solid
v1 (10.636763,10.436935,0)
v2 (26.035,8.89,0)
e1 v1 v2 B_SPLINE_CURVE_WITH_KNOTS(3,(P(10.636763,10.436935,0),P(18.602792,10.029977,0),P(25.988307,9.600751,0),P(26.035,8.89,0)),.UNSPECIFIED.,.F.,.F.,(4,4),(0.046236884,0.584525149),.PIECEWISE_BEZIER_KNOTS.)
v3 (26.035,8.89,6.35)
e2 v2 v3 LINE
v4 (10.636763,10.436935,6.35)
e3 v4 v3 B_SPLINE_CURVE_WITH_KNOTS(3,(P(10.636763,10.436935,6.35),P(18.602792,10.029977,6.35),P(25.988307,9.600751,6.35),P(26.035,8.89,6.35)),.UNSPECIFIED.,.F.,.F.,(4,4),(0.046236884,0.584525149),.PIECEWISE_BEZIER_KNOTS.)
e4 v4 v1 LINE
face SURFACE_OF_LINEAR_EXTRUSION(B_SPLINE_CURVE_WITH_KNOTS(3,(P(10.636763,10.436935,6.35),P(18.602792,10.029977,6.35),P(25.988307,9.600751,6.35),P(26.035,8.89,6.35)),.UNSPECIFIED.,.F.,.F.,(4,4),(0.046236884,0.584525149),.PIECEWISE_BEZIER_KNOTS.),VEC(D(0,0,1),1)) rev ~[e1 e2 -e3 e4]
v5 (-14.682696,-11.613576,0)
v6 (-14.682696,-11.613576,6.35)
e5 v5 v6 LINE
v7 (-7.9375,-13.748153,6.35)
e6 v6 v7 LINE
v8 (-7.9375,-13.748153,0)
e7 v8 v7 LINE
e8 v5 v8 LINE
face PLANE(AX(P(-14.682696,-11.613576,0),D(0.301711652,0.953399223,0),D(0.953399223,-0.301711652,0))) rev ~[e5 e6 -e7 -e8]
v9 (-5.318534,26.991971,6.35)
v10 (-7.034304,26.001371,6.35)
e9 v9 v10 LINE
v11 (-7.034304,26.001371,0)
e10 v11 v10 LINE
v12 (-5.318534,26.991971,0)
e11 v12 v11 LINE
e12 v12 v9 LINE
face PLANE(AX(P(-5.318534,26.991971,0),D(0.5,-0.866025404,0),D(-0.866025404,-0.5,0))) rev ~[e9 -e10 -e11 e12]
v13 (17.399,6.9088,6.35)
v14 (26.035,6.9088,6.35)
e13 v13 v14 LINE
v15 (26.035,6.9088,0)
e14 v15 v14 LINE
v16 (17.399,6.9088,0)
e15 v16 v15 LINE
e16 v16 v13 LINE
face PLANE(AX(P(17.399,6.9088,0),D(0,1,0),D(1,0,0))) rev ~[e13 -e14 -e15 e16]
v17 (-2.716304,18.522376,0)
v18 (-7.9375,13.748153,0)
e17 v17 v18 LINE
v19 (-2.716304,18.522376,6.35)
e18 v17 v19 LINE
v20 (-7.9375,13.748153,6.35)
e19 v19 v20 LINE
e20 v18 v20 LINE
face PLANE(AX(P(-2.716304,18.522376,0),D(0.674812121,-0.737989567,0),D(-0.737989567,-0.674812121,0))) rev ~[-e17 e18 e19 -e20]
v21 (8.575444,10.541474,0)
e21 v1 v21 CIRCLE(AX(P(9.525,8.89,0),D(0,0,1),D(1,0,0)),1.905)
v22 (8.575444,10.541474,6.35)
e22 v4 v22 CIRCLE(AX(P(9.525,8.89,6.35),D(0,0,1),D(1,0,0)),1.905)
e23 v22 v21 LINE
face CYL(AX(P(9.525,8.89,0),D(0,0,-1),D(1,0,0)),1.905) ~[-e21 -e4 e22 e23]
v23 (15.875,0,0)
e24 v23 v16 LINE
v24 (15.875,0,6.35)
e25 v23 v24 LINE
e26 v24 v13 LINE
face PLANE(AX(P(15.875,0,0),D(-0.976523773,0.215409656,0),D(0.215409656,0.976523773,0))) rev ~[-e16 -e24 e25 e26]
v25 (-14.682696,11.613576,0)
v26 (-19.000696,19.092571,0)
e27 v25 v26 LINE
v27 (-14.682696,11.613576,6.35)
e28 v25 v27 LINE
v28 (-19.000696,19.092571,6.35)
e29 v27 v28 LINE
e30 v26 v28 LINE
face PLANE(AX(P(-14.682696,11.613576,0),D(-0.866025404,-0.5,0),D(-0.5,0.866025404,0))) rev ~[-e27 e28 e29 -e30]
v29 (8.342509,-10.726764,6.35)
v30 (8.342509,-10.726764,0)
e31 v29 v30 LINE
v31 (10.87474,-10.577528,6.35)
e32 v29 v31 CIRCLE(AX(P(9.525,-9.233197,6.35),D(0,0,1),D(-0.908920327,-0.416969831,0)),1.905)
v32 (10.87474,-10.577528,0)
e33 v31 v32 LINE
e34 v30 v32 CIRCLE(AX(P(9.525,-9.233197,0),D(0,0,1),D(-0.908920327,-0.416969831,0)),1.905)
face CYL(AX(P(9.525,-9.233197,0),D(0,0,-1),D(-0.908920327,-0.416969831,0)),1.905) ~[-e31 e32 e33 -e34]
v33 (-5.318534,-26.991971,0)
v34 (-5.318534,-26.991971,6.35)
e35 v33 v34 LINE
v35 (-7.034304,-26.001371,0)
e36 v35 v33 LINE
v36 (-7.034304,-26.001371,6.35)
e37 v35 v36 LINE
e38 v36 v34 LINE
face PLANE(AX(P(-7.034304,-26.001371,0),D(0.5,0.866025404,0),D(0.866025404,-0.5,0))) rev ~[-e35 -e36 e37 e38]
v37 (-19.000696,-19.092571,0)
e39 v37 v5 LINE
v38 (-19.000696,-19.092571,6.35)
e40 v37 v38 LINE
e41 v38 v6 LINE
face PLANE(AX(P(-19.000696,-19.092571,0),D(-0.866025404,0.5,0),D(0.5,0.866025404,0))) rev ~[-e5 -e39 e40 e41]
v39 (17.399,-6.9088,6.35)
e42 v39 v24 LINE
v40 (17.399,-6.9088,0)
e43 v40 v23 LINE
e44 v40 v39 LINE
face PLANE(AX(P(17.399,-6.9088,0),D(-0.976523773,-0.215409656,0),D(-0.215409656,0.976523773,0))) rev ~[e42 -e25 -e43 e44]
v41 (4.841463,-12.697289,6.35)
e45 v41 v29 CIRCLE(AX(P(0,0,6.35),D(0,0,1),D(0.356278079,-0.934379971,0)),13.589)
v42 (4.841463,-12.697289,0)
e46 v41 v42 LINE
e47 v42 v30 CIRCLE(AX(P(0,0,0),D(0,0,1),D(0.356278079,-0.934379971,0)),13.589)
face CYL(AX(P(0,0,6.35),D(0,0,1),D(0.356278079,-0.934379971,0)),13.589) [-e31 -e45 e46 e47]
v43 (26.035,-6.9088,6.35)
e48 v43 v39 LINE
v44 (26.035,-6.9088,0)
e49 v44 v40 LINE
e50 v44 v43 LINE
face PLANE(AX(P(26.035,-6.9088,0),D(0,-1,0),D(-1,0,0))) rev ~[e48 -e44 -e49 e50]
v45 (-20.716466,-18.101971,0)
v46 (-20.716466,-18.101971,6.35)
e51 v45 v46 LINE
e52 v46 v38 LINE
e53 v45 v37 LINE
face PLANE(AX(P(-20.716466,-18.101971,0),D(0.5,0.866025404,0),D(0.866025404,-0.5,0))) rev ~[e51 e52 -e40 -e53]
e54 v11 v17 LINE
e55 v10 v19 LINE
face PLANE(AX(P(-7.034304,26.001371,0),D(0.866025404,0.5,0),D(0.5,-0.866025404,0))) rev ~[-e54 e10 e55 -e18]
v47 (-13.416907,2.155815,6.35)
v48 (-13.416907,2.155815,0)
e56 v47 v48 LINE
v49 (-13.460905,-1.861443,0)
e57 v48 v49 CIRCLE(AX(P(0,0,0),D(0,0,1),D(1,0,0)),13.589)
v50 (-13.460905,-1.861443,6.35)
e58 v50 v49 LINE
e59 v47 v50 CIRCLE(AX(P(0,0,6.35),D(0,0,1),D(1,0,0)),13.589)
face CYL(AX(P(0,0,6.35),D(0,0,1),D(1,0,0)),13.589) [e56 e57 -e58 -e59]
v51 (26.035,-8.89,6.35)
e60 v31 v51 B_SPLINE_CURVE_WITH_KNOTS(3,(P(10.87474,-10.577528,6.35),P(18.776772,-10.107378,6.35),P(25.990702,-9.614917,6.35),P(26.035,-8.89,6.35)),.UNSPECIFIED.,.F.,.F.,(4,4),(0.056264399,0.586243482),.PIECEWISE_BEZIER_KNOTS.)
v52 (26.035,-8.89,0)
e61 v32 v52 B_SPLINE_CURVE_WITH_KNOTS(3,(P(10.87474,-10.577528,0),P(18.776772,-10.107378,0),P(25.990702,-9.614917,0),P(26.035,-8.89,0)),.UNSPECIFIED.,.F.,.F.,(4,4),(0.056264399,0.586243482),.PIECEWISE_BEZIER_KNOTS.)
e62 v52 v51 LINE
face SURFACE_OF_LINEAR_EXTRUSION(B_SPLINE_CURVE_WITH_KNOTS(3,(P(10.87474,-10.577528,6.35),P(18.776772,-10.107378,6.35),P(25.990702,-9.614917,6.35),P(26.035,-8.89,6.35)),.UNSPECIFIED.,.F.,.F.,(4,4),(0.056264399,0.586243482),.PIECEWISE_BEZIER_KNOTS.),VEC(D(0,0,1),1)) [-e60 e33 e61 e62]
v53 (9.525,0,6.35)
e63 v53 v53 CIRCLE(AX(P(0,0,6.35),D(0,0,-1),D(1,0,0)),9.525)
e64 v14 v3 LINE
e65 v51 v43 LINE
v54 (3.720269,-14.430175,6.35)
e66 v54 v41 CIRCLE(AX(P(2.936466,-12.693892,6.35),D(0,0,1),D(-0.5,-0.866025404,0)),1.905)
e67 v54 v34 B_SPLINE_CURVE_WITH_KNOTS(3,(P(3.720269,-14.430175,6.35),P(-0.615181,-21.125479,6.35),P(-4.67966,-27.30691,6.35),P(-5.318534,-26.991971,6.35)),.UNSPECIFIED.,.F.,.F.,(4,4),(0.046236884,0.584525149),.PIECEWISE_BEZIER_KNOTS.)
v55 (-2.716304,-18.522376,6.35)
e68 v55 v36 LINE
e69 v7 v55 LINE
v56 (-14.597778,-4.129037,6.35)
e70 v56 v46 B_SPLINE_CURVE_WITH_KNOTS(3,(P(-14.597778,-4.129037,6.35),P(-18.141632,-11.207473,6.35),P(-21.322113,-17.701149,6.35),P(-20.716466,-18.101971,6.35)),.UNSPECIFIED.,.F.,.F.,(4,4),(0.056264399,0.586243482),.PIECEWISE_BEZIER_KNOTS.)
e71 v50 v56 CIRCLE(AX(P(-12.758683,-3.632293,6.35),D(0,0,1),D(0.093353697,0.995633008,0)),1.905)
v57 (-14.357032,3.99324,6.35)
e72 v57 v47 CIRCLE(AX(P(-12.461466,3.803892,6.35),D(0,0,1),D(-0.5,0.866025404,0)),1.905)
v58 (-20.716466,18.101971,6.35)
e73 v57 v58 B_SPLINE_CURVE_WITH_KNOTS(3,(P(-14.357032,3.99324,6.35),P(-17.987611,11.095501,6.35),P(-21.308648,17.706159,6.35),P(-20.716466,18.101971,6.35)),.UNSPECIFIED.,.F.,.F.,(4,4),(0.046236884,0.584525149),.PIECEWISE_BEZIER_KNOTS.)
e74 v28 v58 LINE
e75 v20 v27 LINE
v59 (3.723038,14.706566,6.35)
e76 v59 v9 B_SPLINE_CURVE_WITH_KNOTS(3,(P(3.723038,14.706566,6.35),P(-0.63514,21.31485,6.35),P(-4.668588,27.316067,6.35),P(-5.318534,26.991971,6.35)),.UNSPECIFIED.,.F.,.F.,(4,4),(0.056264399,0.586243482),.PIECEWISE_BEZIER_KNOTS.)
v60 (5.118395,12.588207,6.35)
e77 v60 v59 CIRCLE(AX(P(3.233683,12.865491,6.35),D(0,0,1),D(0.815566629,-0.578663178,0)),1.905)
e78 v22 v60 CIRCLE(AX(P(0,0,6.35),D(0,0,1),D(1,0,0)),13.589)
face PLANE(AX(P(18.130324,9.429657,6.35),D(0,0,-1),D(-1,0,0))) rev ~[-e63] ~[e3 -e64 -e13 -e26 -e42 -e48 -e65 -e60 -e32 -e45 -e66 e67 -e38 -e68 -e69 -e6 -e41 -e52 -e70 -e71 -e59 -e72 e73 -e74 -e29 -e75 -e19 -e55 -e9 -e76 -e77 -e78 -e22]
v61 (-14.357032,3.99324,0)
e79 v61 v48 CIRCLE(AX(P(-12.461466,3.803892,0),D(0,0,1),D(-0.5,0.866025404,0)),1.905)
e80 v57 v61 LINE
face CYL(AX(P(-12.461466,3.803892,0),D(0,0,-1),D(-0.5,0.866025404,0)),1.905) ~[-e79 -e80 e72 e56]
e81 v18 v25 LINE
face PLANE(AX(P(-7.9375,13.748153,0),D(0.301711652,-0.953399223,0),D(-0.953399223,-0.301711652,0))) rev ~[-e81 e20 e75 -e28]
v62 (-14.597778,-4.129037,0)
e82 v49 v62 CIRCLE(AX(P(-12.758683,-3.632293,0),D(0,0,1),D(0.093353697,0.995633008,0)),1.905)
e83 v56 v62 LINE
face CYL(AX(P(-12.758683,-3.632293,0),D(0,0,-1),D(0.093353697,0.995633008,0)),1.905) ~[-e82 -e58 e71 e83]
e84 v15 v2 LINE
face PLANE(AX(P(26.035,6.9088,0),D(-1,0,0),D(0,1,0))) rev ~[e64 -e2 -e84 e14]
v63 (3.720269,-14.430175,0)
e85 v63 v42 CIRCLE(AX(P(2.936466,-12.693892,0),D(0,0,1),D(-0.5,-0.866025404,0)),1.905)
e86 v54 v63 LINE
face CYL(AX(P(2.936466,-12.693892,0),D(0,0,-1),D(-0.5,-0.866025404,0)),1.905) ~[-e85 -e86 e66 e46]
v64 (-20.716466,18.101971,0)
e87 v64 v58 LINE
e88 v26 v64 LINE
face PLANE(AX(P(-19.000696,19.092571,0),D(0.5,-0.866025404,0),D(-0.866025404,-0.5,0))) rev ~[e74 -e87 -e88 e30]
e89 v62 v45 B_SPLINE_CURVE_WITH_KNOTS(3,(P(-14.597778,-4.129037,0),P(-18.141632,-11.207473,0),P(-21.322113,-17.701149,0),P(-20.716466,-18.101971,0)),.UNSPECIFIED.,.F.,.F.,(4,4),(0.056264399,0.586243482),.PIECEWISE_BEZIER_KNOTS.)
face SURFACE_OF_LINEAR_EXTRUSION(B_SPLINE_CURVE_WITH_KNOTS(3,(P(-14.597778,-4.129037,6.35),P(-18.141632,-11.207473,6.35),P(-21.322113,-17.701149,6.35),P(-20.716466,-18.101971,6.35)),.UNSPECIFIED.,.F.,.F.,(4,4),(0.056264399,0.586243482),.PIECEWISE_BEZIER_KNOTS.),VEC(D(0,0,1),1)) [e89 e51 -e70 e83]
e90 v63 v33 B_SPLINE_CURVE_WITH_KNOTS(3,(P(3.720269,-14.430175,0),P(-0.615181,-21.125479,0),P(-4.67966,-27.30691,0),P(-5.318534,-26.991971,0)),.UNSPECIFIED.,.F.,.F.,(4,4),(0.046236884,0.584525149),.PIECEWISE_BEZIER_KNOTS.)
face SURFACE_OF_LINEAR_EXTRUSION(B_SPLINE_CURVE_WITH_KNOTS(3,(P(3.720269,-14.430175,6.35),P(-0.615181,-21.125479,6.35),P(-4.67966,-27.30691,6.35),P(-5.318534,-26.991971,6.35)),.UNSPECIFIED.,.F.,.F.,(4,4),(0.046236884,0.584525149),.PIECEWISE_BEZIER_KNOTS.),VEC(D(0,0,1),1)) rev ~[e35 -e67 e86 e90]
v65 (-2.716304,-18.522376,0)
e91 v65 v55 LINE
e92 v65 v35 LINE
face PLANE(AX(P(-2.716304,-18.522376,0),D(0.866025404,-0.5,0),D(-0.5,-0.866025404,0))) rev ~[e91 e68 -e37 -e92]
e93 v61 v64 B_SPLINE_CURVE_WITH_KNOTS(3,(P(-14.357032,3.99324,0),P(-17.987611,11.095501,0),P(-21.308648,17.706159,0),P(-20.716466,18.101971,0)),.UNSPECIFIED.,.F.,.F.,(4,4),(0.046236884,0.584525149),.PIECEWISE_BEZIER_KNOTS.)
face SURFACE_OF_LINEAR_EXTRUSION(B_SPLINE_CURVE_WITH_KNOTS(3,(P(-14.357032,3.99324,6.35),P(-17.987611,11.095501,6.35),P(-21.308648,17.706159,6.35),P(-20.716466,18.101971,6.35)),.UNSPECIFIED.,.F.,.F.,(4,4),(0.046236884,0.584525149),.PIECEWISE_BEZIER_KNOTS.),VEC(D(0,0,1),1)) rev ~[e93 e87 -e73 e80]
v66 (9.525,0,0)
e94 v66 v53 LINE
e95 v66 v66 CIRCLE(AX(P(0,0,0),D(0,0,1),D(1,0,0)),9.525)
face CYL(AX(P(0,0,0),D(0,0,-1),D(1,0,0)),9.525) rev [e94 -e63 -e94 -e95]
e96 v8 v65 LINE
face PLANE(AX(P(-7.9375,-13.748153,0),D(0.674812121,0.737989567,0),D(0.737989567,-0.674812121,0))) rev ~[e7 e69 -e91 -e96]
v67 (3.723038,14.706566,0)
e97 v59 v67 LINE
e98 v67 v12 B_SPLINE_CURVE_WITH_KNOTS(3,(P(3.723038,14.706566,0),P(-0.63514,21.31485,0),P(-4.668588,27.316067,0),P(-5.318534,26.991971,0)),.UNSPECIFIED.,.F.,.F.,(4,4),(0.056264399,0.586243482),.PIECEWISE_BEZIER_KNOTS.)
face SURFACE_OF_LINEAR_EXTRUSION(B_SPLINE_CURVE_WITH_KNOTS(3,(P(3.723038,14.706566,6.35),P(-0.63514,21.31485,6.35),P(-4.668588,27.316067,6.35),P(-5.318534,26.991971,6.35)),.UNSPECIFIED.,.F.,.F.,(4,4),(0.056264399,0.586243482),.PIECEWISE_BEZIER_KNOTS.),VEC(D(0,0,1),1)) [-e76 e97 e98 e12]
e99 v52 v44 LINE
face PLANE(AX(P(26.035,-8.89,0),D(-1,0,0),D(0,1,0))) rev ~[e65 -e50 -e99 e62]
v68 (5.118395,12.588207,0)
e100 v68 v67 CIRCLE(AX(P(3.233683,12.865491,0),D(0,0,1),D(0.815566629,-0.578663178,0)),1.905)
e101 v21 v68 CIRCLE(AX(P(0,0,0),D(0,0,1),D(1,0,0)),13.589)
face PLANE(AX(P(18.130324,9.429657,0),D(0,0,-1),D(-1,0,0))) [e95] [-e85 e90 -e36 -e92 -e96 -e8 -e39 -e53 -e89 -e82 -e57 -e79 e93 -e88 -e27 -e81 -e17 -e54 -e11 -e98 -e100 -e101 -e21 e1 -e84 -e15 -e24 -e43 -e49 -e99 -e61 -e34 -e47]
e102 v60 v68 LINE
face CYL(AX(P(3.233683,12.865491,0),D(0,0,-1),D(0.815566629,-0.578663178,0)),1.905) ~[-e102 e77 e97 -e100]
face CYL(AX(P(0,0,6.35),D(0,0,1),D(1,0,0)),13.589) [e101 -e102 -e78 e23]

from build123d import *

# Parameters (mm, degrees)
F0_R     = 9.525
F1_DEPTH = 6.35
F3_COUNT = 3
F4_R     = 9.525
F5_DEPTH = 6.35
F7_DEPTH = 6.35


with BuildPart() as f1:
    # F0 (on Top) → F1 (new body)
    with BuildSketch(Plane.XY):
        with BuildLine():
            Line((9.525, 0), (12.7, 0))
            ThreePointArc((12.7, 0), (12.1234798492, 3.7830194747), (10.4462619928, 7.2225764363))
            ThreePointArc((10.4462619928, 7.2225764363), (10.00070112, 7.0453500483), (9.525, 6.985))
            Line((9.525, 6.985), (9.525, 0))
        make_face()
        with BuildLine():
            ThreePointArc((9.525, -8.4002604126), (9.9057858228, -7.9476667791), (10.2650859452, -7.4778346155))
            ThreePointArc((10.2650859452, -7.4778346155), (9.9025309799, -7.3659812593), (9.525, -7.3281971973))
            Line((9.525, -7.3281971973), (9.525, -8.4002604126))
        make_face()
        with BuildLine():
            ThreePointArc((11.3988304843, -8.89), (11.0104940402, -8.040581393), (10.2650859452, -7.4778346155))
            ThreePointArc((10.2650859452, -7.4778346155), (9.9057858228, -7.9476667791), (9.525, -8.4002604126))
            Line((9.525, -8.4002604126), (9.525, -8.89))
            Line((9.525, -8.89), (11.3988304843, -8.89))
        make_face()
        with BuildLine():
            ThreePointArc((7.7935067776, -10.0275247248), (8.6973942383, -9.2544764013), (9.525, -8.4002604126))
            Line((9.525, -8.4002604126), (9.525, -7.3281971973))
            ThreePointArc((9.525, -7.3281971973), (7.921532049, -8.2046469895), (7.7935067776, -10.0275247248))
        make_face()
        with BuildLine():
            Line((9.525, 6.985), (9.525, 8.4002604126))
            ThreePointArc((9.525, 8.4002604126), (8.7581956911, 9.196956466), (7.9249969146, 9.9239318772))
            ThreePointArc((7.9249969146, 9.9239318772), (7.8518793788, 7.9791254823), (9.525, 6.985))
        make_face()
        with BuildLine():
            ThreePointArc((10.4462619928, 7.2225764363), (12.1234798492, 3.7830194747), (12.7, 0))
            Line((12.7, 0), (15.875, 0))
            Line((15.875, 0), (17.399, 6.9088))
            Line((17.399, 6.9088), (26.035, 6.9088))
            Line((26.035, 6.9088), (26.035, 8.89))
            Line((26.035, 8.89), (11.43, 8.89))
            ThreePointArc((11.43, 8.89), (11.1657359776, 7.922006998), (10.4462619928, 7.2225764363))
        make_face()
        with BuildLine():
            ThreePointArc((9.525, 6.985), (10.00070112, 7.0453500483), (10.4462619928, 7.2225764363))
            ThreePointArc((10.4462619928, 7.2225764363), (10.0029776208, 7.8249880969), (9.525, 8.4002604126))
            Line((9.525, 8.4002604126), (9.525, 6.985))
        make_face()
        with BuildLine():
            ThreePointArc((9.525, 8.4002604126), (10.0029776208, 7.8249880969), (10.4462619928, 7.2225764363))
            ThreePointArc((10.4462619928, 7.2225764363), (11.1657359776, 7.922006998), (11.43, 8.89))
            Line((11.43, 8.89), (9.525, 8.89))
            Line((9.525, 8.89), (9.525, 8.4002604126))
        make_face()
        with BuildLine():
            Line((9.525, -8.89), (9.525, -8.4002604126))
            ThreePointArc((9.525, -8.4002604126), (8.6973942383, -9.2544764013), (7.7935067776, -10.0275247248))
            ThreePointArc((7.7935067776, -10.0275247248), (9.9315282348, -11.0943150857), (11.43, -9.2331971973))
            ThreePointArc((11.43, -9.2331971973), (11.4221916182, -9.0608923403), (11.3988304843, -8.89))
            Line((11.3988304843, -8.89), (9.525, -8.89))
        make_face()
        with BuildLine():
            ThreePointArc((7.9249969146, 9.9239318772), (8.7581956911, 9.196956466), (9.525, 8.4002604126))
            Line((9.525, 8.4002604126), (9.525, 8.89))
            Line((9.525, 8.89), (11.43, 8.89))
            ThreePointArc((11.43, 8.89), (10.0639893887, 10.7171604852), (7.9249969146, 9.9239318772))
        make_face()
        with BuildLine():
            Line((15.875, 0), (12.7, 0))
            ThreePointArc((12.7, 0), (12.075938711, -3.9321373638), (10.2650859452, -7.4778346155))
            ThreePointArc((10.2650859452, -7.4778346155), (11.0104940402, -8.040581393), (11.3988304843, -8.89))
            Line((11.3988304843, -8.89), (26.035, -8.89))
            Line((26.035, -8.89), (26.035, -6.9088))
            Line((26.035, -6.9088), (17.399, -6.9088))
            Line((17.399, -6.9088), (15.875, 0))
        make_face()
        with BuildLine():
            ThreePointArc((10.2650859452, -7.4778346155), (12.075938711, -3.9321373638), (12.7, 0))
            Line((12.7, 0), (9.525, 0))
            Line((9.525, 0), (9.525, -7.3281971973))
            ThreePointArc((9.525, -7.3281971973), (9.9025309799, -7.3659812593), (10.2650859452, -7.4778346155))
        make_face()
        with BuildLine():
            Line((9.525, -7.3281971973), (9.525, 0))
            Line((9.525, 0), (9.525, 6.985))
            ThreePointArc((9.525, 6.985), (7.8518793788, 7.9791254823), (7.9249969146, 9.9239318772))
            ThreePointArc((7.9249969146, 9.9239318772), (-12.6997241984, 0.0836975719), (7.7935067776, -10.0275247248))
            ThreePointArc((7.7935067776, -10.0275247248), (7.921532049, -8.2046469895), (9.525, -7.3281971973))
        make_face()
        Circle(F0_R, mode=Mode.SUBTRACT)
    extrude(amount=F1_DEPTH)


with BuildPart() as f3_1:
    # F3: instance of F1
    add(f1.part.rotate(Axis((0, 0, 3.175), (0, 0, 1)), 1 * 360 / F3_COUNT))


with BuildPart() as f3_2:
    # F3: instance of F1
    add(f1.part.rotate(Axis((0, 0, 3.175), (0, 0, 1)), 2 * 360 / F3_COUNT))


with BuildPart() as f1_1:
    add(f1.part)

    add(f3_1.part)  # F5 merges F3_1

    add(f3_2.part)  # F5 merges F3_2
    # F4 (on face) → F5 (join)
    with BuildSketch(Plane.XY.offset(6.35)):
        with BuildLine():
            ThreePointArc((4.8414628101, -12.6972894296), (11.1904325012, -7.7094190078), (13.589, 0))
            ThreePointArc((13.589, 0), (-0.9329227135, 13.5569383052), (-13.4609045126, -1.8614431777))
            ThreePointArc((-13.4609045126, -1.8614431777), (-13.0283174584, -1.7464719499), (-12.5808445376, -1.7356124916))
            ThreePointArc((-12.5808445376, -1.7356124916), (6.4223463228, 10.9564349909), (4.6318786538, -11.8252145916))
            ThreePointArc((4.6318786538, -11.8252145916), (4.7887256176, -12.2487417548), (4.8414628101, -12.6972894296))
        make_face()
        with BuildLine():
            ThreePointArc((-12.5808445376, -1.7356124916), (-13.0283174584, -1.7464719499), (-13.4609045126, -1.8614431777))
            ThreePointArc((-13.4609045126, -1.8614431777), (-6.9229751419, -11.6933030486), (4.8414628101, -12.6972894296))
            ThreePointArc((4.8414628101, -12.6972894296), (4.7887256176, -12.2487417548), (4.6318786538, -11.8252145916))
            ThreePointArc((4.6318786538, -11.8252145916), (6.4223463228, 10.9564349909), (-12.5808445376, -1.7356124916))
        make_face()
        Circle(F4_R, mode=Mode.SUBTRACT)
    extrude(amount=-F5_DEPTH)

    # F6 (on face) → F7 (join)
    with BuildSketch(Plane.XY.offset(6.35)):
        with BuildLine():
            add(Edge.make_bspline(
                [(10.6367632499, 10.4369348649), (18.6027915748, 10.0299773304), (25.9883071623, 9.6007507753), (26.035, 8.89)],
                knots=[0.0462368838, 0.0462368838, 0.0462368838, 0.0462368838, 0.584525149, 0.584525149, 0.584525149, 0.584525149], degree=3))
            ThreePointArc((10.6367632499, 10.4369348649), (11.2201303771, 9.7592283961), (11.43, 8.89))
            Line((11.43, 8.89), (26.035, 8.89))
        make_face()
        with BuildLine():
            ThreePointArc((1.9995505975, 14.3166767728), (2.8133537712, 14.7235401011), (3.7230379132, 14.7065655527))
            add(Edge.make_bspline(
                [(3.7230379132, 14.7065655527), (-0.6351401044, 21.3148502374), (-4.6685883244, 27.3160665919), (-5.3185341604, 26.9919713875)],
                knots=[0.0562643988, 0.0562643988, 0.0562643988, 0.0562643988, 0.5862434824, 0.5862434824, 0.5862434824, 0.5862434824], degree=3))
            Line((-5.3185341604, 26.9919713875), (1.9995505975, 14.3166767728))
        make_face()
        with BuildLine():
            add(Edge.make_bspline(
                [(10.8747404145, -10.5775281884), (18.7767718356, -10.1073776533), (25.9907017622, -9.6149172072), (26.035, -8.89)],
                knots=[0.0562643988, 0.0562643988, 0.0562643988, 0.0562643988, 0.5862434824, 0.5862434824, 0.5862434824, 0.5862434824], degree=3))
            Line((26.035, -8.89), (11.3988304843, -8.89))
            ThreePointArc((11.3988304843, -8.89), (11.3442828756, -9.7982058862), (10.8747404145, -10.5775281884))
        make_face()
        with BuildLine():
            Line((-13.4139658396, 5.4536703653), (-20.7164658396, 18.1019713875))
            add(Edge.make_bspline(
                [(-14.3570323556, 3.993239756), (-17.987610955, 11.0955014199), (-21.3086476479, 17.7061588163), (-20.7164658396, 18.1019713875)],
                knots=[0.0462368838, 0.0462368838, 0.0462368838, 0.0462368838, 0.584525149, 0.584525149, 0.584525149, 0.584525149], degree=3))
            ThreePointArc((-14.3570323556, 3.993239756), (-14.0618049009, 4.8373037423), (-13.4139658396, 5.4536703653))
        make_face()
        with BuildLine():
            add(Edge.make_bspline(
                [(3.7202691057, -14.4301746209), (-0.6151806199, -21.1254787503), (-4.6796595144, -27.3069095915), (-5.3185341604, -26.9919713875)],
                knots=[0.0462368838, 0.0462368838, 0.0462368838, 0.0462368838, 0.584525149, 0.584525149, 0.584525149, 0.584525149], degree=3))
            ThreePointArc((3.7202691057, -14.4301746209), (2.8416745238, -14.5965321384), (1.9839658396, -14.3436703653))
            Line((1.9839658396, -14.3436703653), (-5.3185341604, -26.9919713875))
        make_face()
        with BuildLine():
            ThreePointArc((-13.3983810818, -5.4266767728), (-14.1576366468, -4.9253342149), (-14.5977783276, -4.1290373643))
            add(Edge.make_bspline(
                [(-14.5977783276, -4.1290373643), (-18.1416317312, -11.207472584), (-21.3221134379, -17.7011493846), (-20.7164658396, -18.1019713875)],
                knots=[0.0562643988, 0.0562643988, 0.0562643988, 0.0562643988, 0.5862434824, 0.5862434824, 0.5862434824, 0.5862434824], degree=3))
            Line((-20.7164658396, -18.1019713875), (-13.3983810818, -5.4266767728))
        make_face()
    extrude(amount=-F7_DEPTH)


solid = f1_1.part
